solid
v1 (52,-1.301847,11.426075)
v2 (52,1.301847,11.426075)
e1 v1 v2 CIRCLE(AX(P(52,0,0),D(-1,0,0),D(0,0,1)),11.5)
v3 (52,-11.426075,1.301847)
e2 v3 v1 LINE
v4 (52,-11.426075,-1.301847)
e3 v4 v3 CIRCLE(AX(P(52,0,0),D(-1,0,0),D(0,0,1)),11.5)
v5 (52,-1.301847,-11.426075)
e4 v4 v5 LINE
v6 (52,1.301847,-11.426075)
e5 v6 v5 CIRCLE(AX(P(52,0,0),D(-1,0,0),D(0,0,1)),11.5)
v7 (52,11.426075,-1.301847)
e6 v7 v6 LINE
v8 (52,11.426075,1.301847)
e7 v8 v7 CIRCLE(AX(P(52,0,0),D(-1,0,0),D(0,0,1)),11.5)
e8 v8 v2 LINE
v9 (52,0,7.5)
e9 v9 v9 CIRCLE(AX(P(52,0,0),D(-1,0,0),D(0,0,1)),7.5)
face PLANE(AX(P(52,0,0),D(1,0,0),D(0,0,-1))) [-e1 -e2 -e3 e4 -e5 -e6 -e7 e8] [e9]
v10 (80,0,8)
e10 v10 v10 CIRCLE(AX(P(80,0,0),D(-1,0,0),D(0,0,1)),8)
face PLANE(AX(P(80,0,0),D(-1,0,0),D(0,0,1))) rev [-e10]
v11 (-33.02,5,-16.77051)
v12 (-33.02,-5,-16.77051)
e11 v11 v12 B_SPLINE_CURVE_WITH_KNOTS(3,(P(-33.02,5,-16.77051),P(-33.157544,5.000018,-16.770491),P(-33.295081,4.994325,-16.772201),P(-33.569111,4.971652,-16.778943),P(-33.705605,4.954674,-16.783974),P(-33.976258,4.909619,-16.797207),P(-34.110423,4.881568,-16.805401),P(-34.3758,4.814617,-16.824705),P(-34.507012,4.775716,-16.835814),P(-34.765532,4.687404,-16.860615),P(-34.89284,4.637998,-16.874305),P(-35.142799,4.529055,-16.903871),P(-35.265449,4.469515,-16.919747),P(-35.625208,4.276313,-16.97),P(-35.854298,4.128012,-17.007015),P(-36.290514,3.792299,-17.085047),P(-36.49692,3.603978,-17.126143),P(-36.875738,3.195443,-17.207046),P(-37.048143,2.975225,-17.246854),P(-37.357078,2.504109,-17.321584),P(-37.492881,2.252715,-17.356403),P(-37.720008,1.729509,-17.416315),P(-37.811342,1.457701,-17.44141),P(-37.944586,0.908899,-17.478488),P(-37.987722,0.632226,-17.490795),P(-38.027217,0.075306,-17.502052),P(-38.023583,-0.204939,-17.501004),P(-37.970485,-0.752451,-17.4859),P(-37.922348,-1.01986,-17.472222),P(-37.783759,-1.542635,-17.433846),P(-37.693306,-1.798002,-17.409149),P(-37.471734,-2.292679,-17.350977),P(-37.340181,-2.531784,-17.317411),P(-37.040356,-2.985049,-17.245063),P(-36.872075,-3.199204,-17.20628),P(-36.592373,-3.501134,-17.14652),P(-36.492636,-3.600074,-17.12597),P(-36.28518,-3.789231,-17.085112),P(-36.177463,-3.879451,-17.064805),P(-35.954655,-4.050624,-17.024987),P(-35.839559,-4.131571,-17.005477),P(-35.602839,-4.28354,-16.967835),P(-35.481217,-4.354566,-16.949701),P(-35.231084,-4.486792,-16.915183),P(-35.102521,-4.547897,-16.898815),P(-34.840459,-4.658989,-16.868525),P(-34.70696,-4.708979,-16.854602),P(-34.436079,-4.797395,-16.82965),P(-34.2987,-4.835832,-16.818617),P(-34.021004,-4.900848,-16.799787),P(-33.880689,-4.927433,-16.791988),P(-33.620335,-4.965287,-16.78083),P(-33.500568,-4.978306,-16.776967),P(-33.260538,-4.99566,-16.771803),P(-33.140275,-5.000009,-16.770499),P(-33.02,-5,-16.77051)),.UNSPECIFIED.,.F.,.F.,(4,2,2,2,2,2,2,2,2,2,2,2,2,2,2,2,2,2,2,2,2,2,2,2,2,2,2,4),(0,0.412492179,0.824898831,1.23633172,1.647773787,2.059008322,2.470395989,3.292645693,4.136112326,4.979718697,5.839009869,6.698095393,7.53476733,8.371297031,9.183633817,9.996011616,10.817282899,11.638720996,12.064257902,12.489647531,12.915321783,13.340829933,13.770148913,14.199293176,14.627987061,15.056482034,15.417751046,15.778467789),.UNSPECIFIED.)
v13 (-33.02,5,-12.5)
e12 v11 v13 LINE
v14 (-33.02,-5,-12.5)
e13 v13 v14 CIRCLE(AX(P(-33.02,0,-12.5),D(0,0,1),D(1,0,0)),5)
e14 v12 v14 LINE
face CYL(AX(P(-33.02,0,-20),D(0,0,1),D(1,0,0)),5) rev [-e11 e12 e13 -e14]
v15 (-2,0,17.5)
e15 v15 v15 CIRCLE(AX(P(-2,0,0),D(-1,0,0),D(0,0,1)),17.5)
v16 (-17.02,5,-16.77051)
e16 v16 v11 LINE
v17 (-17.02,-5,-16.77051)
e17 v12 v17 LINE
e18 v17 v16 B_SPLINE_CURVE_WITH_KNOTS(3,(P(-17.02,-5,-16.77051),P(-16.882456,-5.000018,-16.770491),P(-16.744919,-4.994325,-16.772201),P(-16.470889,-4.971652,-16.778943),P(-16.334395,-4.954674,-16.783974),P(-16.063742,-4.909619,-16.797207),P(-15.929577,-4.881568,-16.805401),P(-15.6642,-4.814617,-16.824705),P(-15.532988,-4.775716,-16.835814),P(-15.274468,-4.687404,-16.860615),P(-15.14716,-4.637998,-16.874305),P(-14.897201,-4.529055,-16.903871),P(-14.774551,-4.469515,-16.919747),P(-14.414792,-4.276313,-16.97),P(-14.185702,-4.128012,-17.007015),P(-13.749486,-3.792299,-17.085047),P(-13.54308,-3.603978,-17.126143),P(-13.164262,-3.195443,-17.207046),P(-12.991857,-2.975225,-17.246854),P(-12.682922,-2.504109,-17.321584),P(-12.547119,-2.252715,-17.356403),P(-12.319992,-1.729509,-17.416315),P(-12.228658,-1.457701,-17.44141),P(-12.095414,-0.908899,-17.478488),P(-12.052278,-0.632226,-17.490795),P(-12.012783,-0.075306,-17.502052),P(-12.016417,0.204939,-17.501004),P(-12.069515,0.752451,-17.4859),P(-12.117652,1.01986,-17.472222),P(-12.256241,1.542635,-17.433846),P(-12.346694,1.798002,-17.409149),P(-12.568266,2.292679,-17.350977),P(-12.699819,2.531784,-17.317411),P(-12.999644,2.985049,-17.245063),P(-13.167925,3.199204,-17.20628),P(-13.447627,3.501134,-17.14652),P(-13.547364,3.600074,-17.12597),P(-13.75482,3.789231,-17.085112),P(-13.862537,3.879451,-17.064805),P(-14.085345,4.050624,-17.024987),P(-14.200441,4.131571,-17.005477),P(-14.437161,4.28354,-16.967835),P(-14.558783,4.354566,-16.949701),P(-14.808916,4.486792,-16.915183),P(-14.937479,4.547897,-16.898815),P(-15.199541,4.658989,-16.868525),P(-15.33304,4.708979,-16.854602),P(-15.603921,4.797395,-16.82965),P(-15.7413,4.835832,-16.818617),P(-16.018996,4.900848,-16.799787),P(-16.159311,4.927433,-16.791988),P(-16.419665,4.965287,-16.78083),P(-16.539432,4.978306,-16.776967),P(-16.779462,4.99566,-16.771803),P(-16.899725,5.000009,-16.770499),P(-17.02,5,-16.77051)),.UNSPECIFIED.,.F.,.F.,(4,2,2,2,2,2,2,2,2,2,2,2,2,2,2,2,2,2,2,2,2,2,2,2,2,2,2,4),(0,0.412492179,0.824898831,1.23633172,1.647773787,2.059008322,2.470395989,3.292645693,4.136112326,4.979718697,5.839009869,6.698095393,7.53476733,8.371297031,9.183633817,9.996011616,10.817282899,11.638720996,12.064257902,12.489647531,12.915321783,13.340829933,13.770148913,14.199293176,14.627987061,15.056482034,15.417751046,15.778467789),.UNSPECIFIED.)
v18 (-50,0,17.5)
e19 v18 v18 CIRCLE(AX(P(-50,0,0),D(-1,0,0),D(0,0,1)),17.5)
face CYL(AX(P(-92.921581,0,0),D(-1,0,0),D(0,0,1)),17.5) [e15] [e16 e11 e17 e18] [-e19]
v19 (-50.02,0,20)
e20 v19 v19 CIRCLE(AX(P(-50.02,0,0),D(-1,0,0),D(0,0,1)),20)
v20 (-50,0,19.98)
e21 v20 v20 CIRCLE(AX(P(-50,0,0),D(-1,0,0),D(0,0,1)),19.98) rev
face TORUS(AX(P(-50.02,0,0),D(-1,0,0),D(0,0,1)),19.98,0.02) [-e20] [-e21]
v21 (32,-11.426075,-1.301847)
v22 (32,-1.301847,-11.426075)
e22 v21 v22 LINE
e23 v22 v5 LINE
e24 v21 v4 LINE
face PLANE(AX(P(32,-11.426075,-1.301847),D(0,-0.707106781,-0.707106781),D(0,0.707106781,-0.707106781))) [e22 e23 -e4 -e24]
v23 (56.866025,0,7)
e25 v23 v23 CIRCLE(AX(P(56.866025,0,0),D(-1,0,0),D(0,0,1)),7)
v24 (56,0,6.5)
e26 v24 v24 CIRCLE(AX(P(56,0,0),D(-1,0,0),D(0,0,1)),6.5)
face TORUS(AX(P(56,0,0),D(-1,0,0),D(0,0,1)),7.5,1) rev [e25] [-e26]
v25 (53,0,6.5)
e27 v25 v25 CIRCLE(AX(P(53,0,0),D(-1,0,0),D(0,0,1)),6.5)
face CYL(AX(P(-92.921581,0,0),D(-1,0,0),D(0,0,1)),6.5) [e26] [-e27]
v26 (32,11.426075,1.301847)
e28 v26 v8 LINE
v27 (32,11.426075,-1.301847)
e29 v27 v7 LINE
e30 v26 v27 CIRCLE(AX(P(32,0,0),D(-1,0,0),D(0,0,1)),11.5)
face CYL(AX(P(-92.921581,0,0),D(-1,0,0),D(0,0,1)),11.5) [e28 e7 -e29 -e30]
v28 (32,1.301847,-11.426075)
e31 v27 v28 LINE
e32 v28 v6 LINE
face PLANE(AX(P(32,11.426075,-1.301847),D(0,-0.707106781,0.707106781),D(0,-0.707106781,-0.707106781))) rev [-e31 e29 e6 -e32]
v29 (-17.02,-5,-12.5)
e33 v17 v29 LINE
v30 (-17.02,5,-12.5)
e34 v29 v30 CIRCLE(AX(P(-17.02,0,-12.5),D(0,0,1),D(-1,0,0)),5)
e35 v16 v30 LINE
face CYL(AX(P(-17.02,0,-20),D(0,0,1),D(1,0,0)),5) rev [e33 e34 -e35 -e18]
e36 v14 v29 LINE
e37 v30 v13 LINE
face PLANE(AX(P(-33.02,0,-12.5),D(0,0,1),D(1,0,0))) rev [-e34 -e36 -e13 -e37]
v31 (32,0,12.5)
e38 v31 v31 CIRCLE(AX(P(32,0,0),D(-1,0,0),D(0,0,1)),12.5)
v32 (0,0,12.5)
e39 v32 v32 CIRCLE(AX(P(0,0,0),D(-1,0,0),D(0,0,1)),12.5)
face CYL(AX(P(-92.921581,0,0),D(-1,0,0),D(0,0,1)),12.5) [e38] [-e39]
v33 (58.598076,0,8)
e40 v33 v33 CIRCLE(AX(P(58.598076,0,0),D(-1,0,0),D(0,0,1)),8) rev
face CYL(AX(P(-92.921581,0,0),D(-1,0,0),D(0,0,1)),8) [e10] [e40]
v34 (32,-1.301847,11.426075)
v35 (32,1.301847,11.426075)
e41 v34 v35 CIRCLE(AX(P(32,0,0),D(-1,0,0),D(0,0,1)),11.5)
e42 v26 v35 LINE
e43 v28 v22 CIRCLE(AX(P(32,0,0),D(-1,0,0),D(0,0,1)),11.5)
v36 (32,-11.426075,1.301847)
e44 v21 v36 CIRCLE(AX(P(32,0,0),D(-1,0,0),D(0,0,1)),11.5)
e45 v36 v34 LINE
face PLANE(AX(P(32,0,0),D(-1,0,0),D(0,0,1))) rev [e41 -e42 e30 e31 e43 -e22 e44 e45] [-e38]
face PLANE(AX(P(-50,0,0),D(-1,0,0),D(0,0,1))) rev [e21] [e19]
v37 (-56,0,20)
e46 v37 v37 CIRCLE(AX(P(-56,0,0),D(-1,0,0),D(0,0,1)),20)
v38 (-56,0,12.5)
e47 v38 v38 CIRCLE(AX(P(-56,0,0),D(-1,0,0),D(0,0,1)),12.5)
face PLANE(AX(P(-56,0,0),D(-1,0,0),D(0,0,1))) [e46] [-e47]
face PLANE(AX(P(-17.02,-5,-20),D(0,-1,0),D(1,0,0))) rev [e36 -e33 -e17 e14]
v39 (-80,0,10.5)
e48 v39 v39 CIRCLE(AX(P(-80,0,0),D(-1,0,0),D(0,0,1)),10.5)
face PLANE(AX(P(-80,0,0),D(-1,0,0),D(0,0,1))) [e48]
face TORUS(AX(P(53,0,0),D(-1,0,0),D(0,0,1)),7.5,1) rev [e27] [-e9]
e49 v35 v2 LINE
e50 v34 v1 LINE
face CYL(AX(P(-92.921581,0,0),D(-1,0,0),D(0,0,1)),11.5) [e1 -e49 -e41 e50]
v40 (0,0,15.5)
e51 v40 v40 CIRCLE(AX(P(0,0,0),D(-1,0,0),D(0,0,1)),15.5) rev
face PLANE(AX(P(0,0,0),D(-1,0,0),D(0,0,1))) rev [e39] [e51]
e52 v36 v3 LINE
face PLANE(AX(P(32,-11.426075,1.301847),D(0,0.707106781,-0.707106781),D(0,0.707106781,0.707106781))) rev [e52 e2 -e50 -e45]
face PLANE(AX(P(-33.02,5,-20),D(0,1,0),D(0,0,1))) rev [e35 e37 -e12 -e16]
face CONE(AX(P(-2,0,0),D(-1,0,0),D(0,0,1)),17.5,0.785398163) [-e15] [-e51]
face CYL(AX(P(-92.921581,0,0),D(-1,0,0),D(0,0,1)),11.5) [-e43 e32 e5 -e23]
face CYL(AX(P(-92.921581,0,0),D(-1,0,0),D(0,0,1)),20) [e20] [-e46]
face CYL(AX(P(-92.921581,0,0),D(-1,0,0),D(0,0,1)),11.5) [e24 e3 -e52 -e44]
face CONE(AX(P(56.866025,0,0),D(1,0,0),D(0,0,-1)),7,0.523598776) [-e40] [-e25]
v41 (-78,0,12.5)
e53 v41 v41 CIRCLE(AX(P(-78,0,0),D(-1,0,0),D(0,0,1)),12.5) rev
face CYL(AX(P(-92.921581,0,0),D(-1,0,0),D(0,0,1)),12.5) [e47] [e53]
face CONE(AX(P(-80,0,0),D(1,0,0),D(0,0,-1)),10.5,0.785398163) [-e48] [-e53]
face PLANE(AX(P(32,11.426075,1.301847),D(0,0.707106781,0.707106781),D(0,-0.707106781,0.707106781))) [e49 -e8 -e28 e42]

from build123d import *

# Parameters (mm, degrees)
SKETCH_2_W          = 24
SKETCH_2_H          = 12.5
SKETCH_2_W_2        = 32
FILLET_2_R          = 0.02
CUT_EXTRUDE_1_DEPTH = 20
CUT_EXTRUDE_2_DEPTH = 20
EXTRUDE_2_DEPTH     = 12.5
CHAMFER_3_SIZE      = 2


with BuildPart() as part:
    # 草图2 → 旋转1 (revolve)
    with BuildSketch(Plane(origin=(0, 0, 0), x_dir=(1, 0, 0), z_dir=(0, 1, 0)), mode=Mode.PRIVATE) as revolve_1_sk:
        with Locations((-68, 6.25)):
            Rectangle(SKETCH_2_W, SKETCH_2_H)
        Polygon((-56, 0), (-50, 0), (-50, 17.5), (-50, 20), (-56, 20), (-56, 12.5), align=None)
        Polygon((-50, 0), (0, 0), (0, 12.5), (0, 17.5), (-50, 17.5), align=None)
        with Locations((16, 6.25)):
            Rectangle(SKETCH_2_W_2, SKETCH_2_H)
        Polygon((52, 0), (52, 7.5), (52, 11.5), (32, 11.5), (32, 0), align=None)
        with BuildLine():
            ThreePointArc((56, 6.5), (56.707106781, 6.792893219), (57, 7.5))
            Line((57, 7.5), (57, 0))
            Line((57, 0), (52, 0))
            Line((52, 0), (52, 7.5))
            ThreePointArc((52, 7.5), (52.292893219, 6.792893219), (53, 6.5))
            Line((53, 6.5), (56, 6.5))
        make_face()
        Polygon((57, 8), (57, 7.5), (57, 0), (80, 0), (80, 8), align=None)
    revolve(revolve_1_sk.sketch.rotate(Axis((-92.921580587, 0, 0), (1, 0, 0)), 180), axis=Axis((-92.921580587, 0, 0), (1, 0, 0)))

    # 倒角2: read off the stored shape, not the designer's step
    # 倒角2 outline → 倒角2 (revolve, cut)
    with BuildSketch(Plane.YX):
        Polygon((7, 56.866025404), (7.5, 56.866025404), (7.5, 57), (8, 57), (8, 58.598076211), align=None)
        Polygon((17.5, 0), (15.5, 0), (17.5, -2), align=None)
    revolve(axis=Axis((0, 0, 0), (1, 0, 0)), mode=Mode.SUBTRACT)

    # 圆角2
    fillet_2_edges = [part.edges().sort_by_distance(p)[0] for p in [
        (-50, 0, -20),
    ]]
    fillet(fillet_2_edges, radius=FILLET_2_R)

    # 草图3 → 切除-拉伸1 (cut)
    with BuildSketch(Plane(origin=(52, 0, 0), x_dir=(0, 0, -1), z_dir=(1, 0, 0))):
        Polygon((13.451018428, -3.326790062), (11.426075214, -1.301846848), (1.301846848, -11.426075214), (3.326790062, -13.451018428), align=None)
        Polygon((1.301846848, 11.426075214), (11.426075214, 1.301846848), (13.451018428, 3.326790062), (3.326790062, 13.451018428), align=None)
        Polygon((-13.451018428, 3.326790062), (-11.426075214, 1.301846848), (-1.301846848, 11.426075214), (-3.326790062, 13.451018428), align=None)
        Polygon((-1.301846848, -11.426075214), (-3.326790062, -13.451018428), (-13.451018428, -3.326790062), (-11.426075214, -1.301846848), align=None)
    extrude(amount=-CUT_EXTRUDE_1_DEPTH, mode=Mode.SUBTRACT)

    # 草图5 → 切除-拉伸2 (cut)
    with BuildSketch(Plane.XY):
        with BuildLine():
            Line((-33.02, 5), (-17.02, 5))
            ThreePointArc((-17.02, 5), (-12.02, 0), (-17.02, -5))
            Line((-17.02, -5), (-33.02, -5))
            ThreePointArc((-33.02, -5), (-38.02, 0), (-33.02, 5))
        make_face()
    extrude(amount=-CUT_EXTRUDE_2_DEPTH, mode=Mode.SUBTRACT)

    # 草图4 → 凸台-拉伸2 (add)
    with BuildSketch(Plane.XY):
        with BuildLine():
            Line((-33.02, 5), (-17.02, 5))
            ThreePointArc((-17.02, 5), (-12.02, 0), (-17.02, -5))
            Line((-17.02, -5), (-33.02, -5))
            ThreePointArc((-33.02, -5), (-38.02, 0), (-33.02, 5))
        make_face()
    extrude(amount=-EXTRUDE_2_DEPTH)

    # 倒角3
    chamfer_3_edges = [part.edges().sort_by_distance(p)[0] for p in [
        (-80, 0, -12.5),
    ]]
    chamfer(chamfer_3_edges, length=CHAMFER_3_SIZE)


solid = part.part
